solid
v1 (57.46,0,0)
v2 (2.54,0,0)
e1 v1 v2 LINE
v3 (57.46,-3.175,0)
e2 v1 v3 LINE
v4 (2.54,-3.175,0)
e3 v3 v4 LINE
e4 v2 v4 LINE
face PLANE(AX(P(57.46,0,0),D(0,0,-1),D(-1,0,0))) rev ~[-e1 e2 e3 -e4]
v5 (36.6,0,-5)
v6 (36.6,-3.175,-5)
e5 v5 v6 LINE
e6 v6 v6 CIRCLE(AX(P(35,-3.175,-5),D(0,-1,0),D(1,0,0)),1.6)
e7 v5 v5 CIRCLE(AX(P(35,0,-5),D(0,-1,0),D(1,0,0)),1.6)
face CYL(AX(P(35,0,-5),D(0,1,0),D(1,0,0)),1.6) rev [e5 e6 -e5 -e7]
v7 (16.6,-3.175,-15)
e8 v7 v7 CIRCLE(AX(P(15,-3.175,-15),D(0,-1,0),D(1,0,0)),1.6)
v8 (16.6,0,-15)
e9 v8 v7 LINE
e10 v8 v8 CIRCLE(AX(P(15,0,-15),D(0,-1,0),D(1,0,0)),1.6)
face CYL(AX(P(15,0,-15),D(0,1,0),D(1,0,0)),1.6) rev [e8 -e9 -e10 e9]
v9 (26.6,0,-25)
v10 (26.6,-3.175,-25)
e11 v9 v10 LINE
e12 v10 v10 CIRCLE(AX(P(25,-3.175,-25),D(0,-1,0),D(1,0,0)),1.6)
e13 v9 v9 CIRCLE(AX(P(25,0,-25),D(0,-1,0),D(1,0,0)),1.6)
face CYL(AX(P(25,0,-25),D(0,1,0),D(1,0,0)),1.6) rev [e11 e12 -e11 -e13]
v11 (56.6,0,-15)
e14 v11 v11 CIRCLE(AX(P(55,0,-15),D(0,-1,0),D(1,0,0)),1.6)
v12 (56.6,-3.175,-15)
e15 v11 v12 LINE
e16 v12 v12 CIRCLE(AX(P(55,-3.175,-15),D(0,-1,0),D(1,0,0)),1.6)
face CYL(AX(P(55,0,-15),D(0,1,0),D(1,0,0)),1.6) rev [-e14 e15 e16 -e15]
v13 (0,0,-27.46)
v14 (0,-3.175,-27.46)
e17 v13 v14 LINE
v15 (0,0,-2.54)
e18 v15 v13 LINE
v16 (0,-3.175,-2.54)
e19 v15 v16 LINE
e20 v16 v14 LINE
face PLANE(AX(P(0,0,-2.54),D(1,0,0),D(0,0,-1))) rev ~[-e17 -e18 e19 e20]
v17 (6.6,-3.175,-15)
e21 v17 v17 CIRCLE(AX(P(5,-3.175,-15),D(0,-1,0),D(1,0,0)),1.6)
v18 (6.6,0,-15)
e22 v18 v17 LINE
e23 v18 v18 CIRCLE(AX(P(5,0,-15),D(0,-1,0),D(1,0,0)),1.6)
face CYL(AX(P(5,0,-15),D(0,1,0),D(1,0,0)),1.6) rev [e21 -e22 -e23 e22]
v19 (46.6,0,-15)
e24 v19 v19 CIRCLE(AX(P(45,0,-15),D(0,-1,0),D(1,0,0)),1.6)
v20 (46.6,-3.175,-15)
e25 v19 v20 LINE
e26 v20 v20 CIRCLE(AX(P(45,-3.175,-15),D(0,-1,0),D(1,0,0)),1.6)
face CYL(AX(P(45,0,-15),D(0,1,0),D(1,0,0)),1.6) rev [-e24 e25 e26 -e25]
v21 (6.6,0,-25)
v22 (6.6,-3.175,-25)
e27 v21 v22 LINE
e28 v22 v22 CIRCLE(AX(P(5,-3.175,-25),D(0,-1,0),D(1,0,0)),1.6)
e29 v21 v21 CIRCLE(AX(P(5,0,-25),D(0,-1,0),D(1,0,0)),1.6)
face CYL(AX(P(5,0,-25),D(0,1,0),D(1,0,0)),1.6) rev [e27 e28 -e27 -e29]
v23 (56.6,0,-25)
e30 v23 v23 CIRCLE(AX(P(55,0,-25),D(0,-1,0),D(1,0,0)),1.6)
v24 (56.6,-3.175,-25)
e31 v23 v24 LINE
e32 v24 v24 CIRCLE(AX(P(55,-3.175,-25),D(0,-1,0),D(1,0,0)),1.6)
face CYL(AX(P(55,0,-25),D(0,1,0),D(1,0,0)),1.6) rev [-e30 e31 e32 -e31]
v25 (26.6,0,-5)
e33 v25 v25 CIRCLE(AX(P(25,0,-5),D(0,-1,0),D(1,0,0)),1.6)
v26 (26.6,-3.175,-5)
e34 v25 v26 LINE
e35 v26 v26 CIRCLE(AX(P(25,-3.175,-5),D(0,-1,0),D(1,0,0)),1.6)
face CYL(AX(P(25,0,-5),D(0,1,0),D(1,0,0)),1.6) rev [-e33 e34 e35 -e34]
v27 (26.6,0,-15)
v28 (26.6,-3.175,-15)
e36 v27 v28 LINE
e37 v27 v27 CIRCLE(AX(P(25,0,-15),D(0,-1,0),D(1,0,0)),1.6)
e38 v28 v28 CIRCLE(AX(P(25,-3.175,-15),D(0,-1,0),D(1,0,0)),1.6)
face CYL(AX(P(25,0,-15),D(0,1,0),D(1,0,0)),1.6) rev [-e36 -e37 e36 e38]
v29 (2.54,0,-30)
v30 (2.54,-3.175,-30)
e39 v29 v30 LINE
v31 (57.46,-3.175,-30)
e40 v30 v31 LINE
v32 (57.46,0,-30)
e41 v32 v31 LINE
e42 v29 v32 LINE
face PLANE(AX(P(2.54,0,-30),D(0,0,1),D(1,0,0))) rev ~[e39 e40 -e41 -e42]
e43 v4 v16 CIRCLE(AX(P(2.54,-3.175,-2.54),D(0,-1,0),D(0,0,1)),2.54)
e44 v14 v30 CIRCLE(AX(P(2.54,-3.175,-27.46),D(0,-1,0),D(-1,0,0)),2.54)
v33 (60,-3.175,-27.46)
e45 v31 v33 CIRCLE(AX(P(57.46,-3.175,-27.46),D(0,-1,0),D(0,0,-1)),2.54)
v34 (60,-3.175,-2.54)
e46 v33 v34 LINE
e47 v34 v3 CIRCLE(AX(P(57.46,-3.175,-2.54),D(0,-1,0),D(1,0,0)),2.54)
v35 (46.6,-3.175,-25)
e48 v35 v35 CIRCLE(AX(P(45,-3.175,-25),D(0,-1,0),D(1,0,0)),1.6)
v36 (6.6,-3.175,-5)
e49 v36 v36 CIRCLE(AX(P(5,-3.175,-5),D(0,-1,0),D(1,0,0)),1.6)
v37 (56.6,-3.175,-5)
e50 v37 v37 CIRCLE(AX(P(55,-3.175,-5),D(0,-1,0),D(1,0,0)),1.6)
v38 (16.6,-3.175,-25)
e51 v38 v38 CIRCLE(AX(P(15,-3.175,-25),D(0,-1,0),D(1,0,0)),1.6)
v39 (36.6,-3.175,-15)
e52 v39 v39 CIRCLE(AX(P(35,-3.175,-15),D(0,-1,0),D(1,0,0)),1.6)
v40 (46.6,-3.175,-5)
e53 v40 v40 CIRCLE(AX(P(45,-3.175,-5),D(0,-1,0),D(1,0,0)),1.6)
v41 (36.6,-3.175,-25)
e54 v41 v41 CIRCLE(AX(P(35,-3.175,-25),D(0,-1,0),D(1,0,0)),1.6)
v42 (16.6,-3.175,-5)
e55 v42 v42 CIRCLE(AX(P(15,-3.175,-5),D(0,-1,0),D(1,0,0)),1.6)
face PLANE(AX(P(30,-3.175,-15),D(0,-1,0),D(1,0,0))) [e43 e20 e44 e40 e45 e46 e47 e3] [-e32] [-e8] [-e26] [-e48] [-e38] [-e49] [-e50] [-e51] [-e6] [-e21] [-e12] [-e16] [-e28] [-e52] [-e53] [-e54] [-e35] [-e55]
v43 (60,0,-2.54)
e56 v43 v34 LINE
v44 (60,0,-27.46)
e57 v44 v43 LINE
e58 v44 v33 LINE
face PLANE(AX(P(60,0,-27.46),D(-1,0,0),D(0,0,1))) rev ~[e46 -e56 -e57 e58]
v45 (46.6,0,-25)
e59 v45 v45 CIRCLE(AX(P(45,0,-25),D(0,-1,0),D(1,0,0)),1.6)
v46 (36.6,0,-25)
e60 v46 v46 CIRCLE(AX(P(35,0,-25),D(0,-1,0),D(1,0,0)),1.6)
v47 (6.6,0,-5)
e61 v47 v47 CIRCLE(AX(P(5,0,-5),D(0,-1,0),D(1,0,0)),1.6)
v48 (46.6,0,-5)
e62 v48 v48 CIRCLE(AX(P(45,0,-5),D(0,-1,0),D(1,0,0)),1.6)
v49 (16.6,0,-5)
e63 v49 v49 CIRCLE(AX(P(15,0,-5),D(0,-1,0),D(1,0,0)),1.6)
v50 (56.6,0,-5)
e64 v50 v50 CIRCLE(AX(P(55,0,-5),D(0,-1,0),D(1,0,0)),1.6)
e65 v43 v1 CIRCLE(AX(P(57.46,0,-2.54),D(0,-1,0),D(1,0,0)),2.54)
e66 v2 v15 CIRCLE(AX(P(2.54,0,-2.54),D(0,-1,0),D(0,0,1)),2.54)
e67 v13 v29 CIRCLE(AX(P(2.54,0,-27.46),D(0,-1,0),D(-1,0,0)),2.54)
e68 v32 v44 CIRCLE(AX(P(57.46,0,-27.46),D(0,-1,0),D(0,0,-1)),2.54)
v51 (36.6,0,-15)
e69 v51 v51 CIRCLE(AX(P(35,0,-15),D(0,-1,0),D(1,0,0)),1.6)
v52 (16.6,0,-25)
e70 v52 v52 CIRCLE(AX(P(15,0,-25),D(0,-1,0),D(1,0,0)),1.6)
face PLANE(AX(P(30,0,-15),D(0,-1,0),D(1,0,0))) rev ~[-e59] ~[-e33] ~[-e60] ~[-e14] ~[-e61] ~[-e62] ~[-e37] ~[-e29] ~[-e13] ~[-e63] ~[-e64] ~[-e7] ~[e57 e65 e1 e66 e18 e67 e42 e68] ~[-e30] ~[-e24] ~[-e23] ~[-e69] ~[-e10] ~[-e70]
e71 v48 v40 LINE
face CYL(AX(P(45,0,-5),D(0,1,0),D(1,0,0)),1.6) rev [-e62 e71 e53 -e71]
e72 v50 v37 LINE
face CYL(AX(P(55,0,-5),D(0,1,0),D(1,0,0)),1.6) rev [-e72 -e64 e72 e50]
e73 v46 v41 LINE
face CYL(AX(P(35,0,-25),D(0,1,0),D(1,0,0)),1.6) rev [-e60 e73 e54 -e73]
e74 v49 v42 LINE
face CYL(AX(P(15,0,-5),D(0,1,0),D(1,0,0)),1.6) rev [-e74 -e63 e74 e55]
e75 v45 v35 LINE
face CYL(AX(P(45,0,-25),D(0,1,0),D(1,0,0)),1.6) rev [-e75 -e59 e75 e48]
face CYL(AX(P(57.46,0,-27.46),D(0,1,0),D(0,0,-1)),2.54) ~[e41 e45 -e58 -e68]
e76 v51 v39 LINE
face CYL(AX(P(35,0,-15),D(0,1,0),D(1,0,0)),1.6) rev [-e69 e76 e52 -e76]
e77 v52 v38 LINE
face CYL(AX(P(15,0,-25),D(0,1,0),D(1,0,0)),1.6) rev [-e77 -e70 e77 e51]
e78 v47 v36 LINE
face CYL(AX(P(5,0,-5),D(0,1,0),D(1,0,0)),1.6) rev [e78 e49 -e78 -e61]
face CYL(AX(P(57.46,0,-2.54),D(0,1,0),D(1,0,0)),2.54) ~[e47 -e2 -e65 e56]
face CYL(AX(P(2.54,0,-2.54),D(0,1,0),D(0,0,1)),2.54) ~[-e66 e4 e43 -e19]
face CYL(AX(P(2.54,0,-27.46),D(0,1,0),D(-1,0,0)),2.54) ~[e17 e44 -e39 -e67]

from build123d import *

# Parameters (mm, degrees)
F0_R     = 1.6
F1_DEPTH = 3.175


# Not quite as in the source:
# - a length typed as a fraction of an inch, garbled in the dataset ("3 / 203.2 mm" for 3/8 in), is restored


with BuildPart() as f1:
    # F0 (on Front) → F1 (new body)
    with BuildSketch(Plane.XZ):
        with BuildLine():
            Line((57.46, 0), (2.54, 0))
            ThreePointArc((2.54, 0), (0.7439487758, -0.7439487758), (0, -2.54))
            Line((0, -2.54), (0, -27.46))
            ThreePointArc((0, -27.46), (0.7439487758, -29.2560512242), (2.54, -30))
            Line((2.54, -30), (57.46, -30))
            ThreePointArc((57.46, -30), (59.2560512242, -29.2560512242), (60, -27.46))
            Line((60, -27.46), (60, -2.54))
            ThreePointArc((60, -2.54), (59.2560512242, -0.7439487758), (57.46, 0))
        make_face()
        with Locations((5, -25)):
            Circle(F0_R, mode=Mode.SUBTRACT)
        with Locations((15, -25)):
            Circle(F0_R, mode=Mode.SUBTRACT)
        with Locations((25, -25)):
            Circle(F0_R, mode=Mode.SUBTRACT)
        with Locations((35, -25)):
            Circle(F0_R, mode=Mode.SUBTRACT)
        with Locations((45, -25)):
            Circle(F0_R, mode=Mode.SUBTRACT)
        with Locations((55, -25)):
            Circle(F0_R, mode=Mode.SUBTRACT)
        with Locations((5, -15)):
            Circle(F0_R, mode=Mode.SUBTRACT)
        with Locations((15, -15)):
            Circle(F0_R, mode=Mode.SUBTRACT)
        with Locations((25, -15)):
            Circle(F0_R, mode=Mode.SUBTRACT)
        with Locations((5, -5)):
            Circle(F0_R, mode=Mode.SUBTRACT)
        with Locations((15, -5)):
            Circle(F0_R, mode=Mode.SUBTRACT)
        with Locations((25, -5)):
            Circle(F0_R, mode=Mode.SUBTRACT)
        with Locations((35, -15)):
            Circle(F0_R, mode=Mode.SUBTRACT)
        with Locations((45, -15)):
            Circle(F0_R, mode=Mode.SUBTRACT)
        with Locations((55, -15)):
            Circle(F0_R, mode=Mode.SUBTRACT)
        with Locations((35, -5)):
            Circle(F0_R, mode=Mode.SUBTRACT)
        with Locations((45, -5)):
            Circle(F0_R, mode=Mode.SUBTRACT)
        with Locations((55, -5)):
            Circle(F0_R, mode=Mode.SUBTRACT)
    extrude(amount=F1_DEPTH)


solid = f1.part
